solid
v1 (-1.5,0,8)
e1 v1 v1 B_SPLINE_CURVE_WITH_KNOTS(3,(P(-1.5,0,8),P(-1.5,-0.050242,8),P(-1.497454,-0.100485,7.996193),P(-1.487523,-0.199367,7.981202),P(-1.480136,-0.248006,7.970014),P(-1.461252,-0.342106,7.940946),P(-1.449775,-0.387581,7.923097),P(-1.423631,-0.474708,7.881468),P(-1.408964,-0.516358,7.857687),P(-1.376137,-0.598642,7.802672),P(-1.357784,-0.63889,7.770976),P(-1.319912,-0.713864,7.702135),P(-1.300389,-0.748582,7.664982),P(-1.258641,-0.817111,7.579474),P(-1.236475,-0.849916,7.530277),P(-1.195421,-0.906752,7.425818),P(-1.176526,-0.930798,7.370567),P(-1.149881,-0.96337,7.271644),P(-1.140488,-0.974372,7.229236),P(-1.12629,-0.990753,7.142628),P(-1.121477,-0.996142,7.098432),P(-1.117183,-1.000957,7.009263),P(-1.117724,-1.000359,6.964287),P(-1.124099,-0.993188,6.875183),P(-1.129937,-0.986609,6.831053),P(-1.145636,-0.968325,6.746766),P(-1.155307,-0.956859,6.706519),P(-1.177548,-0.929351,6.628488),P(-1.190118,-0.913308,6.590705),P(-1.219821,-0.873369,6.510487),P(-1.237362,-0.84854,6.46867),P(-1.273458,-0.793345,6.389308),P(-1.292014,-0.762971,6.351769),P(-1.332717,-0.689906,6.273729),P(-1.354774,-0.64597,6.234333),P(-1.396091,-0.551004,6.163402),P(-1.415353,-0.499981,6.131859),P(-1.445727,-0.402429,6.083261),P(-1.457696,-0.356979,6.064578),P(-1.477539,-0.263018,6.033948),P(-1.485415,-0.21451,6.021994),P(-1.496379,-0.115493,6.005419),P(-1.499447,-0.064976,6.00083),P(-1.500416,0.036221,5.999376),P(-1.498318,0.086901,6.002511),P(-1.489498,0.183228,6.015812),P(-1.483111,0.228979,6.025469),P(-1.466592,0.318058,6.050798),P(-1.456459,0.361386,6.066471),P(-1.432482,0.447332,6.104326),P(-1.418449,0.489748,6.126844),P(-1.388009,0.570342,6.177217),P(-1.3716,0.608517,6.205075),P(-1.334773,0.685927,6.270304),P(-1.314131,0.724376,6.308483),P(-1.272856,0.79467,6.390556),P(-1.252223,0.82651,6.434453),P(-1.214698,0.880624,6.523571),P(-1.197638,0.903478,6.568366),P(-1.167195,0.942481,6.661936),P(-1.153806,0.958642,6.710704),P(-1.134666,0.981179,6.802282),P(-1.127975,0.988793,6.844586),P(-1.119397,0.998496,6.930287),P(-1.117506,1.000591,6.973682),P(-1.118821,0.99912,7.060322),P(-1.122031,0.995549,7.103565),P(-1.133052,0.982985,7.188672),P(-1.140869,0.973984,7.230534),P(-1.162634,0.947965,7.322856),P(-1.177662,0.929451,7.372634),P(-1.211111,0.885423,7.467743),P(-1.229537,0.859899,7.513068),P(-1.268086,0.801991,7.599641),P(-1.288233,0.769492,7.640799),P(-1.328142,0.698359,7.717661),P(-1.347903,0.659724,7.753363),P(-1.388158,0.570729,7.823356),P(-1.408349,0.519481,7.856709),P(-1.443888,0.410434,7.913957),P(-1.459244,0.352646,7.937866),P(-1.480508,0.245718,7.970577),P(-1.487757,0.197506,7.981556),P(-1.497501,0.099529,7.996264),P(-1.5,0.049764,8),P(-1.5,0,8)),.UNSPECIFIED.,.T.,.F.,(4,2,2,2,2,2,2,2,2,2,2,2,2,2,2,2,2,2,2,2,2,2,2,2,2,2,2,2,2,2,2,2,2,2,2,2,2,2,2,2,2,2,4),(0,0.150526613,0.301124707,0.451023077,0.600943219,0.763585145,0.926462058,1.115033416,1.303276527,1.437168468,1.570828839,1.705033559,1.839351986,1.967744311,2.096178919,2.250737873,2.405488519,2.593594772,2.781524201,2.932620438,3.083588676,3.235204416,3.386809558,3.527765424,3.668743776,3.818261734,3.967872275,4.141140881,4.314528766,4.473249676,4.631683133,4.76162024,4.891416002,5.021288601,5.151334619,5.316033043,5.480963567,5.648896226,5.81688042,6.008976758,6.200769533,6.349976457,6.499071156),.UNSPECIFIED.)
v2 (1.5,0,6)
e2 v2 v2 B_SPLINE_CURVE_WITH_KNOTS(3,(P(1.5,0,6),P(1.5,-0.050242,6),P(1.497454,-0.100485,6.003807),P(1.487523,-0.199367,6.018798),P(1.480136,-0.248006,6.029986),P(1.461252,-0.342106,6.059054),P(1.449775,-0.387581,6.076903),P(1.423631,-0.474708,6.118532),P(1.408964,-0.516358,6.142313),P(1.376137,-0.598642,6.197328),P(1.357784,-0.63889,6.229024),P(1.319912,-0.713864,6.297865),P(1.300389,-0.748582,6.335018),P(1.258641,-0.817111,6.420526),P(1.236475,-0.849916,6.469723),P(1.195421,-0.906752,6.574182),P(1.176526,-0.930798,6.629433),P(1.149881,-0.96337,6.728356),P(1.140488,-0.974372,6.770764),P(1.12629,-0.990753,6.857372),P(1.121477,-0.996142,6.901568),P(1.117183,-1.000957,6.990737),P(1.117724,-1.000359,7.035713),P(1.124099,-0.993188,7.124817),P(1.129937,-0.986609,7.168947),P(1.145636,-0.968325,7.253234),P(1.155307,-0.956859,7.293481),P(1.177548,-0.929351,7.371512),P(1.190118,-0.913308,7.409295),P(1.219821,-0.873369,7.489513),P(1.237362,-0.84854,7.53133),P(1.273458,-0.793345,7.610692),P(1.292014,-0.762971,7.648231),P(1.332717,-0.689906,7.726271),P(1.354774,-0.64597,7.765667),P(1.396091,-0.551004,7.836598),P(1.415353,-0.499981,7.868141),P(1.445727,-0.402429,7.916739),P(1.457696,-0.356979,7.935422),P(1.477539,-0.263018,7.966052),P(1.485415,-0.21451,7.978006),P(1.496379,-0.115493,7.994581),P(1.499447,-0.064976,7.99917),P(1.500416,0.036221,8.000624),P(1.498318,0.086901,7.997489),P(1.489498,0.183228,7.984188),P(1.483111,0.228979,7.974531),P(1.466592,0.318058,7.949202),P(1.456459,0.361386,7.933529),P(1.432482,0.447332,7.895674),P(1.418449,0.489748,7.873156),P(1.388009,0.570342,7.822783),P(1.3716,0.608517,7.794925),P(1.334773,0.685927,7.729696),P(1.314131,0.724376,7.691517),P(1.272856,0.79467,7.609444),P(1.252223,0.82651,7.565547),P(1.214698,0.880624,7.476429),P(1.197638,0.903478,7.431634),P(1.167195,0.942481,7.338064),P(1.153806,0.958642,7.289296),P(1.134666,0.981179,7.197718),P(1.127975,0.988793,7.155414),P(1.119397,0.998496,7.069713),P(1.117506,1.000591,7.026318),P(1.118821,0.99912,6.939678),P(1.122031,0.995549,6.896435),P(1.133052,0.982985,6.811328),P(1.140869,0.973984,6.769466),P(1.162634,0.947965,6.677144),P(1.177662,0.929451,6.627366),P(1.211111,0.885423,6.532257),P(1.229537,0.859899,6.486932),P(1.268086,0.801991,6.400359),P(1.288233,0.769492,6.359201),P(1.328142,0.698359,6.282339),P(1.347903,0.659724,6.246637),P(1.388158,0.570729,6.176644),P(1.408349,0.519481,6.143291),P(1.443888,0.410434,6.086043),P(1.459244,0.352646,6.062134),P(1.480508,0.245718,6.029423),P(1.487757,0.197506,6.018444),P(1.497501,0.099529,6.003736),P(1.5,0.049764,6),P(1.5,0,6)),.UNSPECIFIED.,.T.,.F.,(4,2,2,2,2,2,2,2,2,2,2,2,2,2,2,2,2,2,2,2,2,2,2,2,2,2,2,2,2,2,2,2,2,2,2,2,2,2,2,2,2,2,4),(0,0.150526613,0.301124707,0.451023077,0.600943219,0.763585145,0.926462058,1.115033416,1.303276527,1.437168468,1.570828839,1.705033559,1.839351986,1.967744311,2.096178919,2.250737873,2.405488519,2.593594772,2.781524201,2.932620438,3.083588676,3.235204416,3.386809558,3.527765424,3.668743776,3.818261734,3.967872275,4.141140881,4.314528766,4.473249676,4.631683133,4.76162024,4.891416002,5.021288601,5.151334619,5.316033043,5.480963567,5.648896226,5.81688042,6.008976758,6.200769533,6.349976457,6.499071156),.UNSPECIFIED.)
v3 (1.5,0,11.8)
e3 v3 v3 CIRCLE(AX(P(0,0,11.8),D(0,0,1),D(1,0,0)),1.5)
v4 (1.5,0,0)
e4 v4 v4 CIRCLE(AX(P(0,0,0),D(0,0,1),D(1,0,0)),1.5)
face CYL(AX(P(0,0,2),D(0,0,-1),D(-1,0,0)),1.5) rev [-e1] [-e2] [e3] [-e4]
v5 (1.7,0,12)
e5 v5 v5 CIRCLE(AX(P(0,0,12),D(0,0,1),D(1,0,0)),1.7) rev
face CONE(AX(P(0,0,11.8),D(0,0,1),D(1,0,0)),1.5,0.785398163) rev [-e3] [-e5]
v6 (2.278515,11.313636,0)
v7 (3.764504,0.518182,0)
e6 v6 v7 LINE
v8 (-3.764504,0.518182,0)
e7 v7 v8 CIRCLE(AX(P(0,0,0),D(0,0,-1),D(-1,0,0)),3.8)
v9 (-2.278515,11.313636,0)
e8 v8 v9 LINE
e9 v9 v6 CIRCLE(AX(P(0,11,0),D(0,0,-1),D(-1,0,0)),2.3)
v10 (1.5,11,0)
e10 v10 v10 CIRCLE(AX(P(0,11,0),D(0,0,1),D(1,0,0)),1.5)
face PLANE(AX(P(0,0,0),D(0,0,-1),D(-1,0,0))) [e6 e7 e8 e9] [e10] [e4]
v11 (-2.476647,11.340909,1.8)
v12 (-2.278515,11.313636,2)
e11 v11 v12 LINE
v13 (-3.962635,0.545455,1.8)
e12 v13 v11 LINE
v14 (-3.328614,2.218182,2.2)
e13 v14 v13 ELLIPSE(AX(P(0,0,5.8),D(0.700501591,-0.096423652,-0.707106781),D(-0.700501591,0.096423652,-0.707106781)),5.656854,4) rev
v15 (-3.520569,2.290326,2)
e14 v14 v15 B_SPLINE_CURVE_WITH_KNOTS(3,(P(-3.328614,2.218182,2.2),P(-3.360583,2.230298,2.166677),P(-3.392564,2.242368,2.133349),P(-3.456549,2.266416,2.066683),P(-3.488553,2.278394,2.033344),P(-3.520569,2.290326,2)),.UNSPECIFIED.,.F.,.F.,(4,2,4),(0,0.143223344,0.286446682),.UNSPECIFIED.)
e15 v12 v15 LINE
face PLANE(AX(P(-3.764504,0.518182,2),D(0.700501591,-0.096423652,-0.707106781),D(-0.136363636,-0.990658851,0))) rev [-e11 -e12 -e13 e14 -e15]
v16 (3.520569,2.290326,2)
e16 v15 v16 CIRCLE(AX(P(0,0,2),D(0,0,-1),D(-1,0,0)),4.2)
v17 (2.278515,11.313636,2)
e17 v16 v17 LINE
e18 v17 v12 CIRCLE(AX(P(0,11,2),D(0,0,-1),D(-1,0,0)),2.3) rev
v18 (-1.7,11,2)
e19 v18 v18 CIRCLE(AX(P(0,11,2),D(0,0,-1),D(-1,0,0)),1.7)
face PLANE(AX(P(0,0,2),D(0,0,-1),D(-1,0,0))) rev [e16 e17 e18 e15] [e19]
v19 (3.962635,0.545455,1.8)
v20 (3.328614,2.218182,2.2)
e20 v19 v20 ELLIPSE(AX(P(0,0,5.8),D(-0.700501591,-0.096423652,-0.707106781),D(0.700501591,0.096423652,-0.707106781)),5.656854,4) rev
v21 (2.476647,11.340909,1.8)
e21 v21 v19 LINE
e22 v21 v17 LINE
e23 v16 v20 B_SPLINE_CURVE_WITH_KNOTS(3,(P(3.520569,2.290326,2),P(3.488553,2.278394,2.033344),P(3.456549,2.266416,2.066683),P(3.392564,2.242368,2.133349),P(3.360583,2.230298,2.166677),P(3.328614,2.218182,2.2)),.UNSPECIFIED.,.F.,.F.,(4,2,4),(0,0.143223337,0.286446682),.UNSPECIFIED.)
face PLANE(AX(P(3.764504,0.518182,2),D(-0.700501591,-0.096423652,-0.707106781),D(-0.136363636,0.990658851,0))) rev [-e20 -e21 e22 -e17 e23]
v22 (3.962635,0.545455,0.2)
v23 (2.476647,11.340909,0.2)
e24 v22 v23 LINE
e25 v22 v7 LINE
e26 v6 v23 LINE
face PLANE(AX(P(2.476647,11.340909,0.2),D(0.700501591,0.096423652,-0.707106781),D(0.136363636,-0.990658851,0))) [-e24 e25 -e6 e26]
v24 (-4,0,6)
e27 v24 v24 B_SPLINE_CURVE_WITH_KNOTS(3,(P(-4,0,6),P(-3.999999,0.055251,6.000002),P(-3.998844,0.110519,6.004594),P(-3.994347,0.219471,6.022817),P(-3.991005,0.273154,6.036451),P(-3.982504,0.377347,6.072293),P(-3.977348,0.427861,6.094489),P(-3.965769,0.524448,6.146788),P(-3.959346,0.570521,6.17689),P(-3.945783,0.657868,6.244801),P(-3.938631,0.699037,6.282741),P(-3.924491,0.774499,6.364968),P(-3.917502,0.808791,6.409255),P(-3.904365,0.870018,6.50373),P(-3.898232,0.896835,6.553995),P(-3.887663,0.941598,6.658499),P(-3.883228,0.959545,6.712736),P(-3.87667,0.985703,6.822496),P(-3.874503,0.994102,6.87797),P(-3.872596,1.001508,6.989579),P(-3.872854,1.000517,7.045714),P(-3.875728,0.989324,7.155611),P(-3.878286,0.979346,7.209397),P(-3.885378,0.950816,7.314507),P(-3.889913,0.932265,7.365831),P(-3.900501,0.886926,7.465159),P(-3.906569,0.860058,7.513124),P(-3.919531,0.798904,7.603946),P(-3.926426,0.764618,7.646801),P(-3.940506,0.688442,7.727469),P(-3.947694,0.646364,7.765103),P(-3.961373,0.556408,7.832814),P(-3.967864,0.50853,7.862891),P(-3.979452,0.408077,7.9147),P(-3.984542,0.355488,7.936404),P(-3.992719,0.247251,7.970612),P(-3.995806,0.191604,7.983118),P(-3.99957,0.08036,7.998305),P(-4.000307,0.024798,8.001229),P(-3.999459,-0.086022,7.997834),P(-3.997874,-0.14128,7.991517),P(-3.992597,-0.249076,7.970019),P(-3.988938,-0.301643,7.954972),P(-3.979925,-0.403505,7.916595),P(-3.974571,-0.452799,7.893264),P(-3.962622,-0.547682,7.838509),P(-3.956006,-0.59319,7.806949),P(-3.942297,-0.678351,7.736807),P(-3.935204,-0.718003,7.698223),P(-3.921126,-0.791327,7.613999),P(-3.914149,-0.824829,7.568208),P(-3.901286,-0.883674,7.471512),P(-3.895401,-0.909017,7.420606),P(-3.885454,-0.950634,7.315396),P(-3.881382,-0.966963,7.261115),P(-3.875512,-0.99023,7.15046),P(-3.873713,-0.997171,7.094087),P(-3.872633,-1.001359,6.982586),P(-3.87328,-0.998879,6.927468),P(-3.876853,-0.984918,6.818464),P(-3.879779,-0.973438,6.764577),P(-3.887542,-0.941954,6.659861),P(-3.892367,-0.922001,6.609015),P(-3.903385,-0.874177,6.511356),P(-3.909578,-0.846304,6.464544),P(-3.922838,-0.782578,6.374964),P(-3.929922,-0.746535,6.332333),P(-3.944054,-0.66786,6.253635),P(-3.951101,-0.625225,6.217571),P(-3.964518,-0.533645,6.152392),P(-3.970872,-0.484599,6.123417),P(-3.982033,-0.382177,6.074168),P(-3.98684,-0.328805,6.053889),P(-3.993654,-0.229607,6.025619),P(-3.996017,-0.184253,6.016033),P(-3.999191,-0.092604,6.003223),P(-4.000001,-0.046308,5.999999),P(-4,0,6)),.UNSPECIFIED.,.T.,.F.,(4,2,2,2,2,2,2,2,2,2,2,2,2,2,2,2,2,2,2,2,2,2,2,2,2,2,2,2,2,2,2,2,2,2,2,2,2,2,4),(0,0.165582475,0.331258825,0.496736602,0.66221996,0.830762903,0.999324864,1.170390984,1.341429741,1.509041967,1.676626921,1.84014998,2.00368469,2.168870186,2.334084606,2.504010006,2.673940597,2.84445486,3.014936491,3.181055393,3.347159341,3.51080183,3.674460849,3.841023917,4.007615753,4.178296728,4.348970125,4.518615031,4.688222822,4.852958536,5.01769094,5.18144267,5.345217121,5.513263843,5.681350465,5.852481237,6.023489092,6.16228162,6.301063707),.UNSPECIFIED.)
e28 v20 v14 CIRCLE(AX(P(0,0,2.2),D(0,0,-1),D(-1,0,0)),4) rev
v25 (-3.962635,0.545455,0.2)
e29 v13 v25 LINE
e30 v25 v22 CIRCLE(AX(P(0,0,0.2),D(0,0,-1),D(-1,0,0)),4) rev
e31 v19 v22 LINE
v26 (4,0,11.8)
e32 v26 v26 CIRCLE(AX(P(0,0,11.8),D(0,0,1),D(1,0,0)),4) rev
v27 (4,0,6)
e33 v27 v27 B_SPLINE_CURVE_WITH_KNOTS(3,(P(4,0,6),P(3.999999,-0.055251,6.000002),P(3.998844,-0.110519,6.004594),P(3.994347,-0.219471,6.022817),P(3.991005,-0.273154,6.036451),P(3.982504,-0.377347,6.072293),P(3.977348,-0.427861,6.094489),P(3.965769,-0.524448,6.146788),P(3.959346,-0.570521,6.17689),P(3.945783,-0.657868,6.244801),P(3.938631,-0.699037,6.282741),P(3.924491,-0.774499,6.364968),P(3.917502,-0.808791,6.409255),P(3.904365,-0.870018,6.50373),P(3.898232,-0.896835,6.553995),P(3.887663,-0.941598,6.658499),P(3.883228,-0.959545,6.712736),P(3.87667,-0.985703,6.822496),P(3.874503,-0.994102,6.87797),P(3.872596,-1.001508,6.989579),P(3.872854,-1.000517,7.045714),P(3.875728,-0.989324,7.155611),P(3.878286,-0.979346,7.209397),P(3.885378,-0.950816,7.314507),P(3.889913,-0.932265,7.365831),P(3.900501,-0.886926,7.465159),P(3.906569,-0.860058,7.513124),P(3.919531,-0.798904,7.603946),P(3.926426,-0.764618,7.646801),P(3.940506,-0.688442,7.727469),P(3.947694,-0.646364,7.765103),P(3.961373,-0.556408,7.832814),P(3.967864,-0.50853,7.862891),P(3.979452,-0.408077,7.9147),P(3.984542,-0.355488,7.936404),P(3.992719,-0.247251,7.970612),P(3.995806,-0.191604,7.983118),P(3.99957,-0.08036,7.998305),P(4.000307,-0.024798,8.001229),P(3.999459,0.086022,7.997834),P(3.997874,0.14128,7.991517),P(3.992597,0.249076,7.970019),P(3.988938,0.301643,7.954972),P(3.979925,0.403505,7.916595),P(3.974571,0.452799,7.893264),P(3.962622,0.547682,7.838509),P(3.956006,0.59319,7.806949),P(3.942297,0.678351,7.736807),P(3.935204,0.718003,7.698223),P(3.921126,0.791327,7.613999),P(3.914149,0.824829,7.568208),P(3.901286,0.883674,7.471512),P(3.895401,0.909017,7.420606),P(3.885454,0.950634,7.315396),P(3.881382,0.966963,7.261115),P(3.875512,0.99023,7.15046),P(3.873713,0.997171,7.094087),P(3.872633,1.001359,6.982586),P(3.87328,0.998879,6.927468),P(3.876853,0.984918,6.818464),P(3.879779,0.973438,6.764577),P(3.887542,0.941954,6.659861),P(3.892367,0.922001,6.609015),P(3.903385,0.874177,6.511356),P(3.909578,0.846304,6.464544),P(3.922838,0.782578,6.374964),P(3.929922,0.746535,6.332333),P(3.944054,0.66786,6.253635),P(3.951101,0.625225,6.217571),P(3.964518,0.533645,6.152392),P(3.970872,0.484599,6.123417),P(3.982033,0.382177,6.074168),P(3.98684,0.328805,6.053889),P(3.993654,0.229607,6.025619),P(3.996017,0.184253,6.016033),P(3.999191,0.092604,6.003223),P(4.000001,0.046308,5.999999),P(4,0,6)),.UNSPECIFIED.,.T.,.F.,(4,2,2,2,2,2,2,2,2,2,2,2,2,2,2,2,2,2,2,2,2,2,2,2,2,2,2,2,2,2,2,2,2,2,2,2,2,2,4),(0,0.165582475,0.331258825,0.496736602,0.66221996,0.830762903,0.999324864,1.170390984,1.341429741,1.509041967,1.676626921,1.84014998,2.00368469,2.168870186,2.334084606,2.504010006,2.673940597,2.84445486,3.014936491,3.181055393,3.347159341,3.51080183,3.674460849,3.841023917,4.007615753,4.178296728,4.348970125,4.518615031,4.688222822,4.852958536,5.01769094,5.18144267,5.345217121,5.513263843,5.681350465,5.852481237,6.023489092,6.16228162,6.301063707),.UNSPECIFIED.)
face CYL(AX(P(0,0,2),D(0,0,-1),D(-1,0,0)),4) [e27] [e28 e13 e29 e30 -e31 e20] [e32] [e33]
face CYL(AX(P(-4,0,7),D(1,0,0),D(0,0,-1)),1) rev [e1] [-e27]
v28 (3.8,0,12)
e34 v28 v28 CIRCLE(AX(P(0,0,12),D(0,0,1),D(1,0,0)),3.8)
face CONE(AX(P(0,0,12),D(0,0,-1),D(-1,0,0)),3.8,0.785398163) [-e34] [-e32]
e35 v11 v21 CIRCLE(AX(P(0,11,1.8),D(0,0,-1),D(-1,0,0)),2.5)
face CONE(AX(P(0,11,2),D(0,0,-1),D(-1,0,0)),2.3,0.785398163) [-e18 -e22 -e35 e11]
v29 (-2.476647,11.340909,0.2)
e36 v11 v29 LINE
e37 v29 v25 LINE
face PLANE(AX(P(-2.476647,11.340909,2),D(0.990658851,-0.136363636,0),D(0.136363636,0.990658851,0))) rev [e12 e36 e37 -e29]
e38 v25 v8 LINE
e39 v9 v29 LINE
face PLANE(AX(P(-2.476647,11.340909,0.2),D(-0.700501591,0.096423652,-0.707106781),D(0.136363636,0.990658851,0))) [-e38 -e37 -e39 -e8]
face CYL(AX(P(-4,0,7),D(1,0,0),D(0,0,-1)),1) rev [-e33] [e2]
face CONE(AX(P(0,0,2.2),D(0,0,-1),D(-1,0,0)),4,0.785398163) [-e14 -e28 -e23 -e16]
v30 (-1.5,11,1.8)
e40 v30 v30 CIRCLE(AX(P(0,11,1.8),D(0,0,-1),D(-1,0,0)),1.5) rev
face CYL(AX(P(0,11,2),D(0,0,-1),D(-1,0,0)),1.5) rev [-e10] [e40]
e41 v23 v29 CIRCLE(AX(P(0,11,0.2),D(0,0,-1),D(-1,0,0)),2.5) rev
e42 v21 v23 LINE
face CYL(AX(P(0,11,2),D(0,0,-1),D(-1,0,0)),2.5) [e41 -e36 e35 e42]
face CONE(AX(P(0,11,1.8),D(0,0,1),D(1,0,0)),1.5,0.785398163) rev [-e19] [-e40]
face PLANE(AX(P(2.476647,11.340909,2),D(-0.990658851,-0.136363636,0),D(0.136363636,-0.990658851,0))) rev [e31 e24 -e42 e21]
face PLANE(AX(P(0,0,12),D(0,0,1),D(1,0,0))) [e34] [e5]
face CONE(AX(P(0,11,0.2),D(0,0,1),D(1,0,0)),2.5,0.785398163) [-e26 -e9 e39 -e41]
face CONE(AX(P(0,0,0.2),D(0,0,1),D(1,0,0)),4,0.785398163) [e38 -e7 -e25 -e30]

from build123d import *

# Parameters (mm, degrees)
SKETCH1_R               = 1.5
BOSS_EXTRUDE1_DEPTH     = 2
SKETCH2_R               = 4
SKETCH2_R_2             = 1.5
BOSS_EXTRUDE2_DEPTH     = 10
CUT_EXTRUDE1_DEPTH      = 19.5
CUT_EXTRUDE1_DEPTH_BACK = 19.5
SKETCH3_R               = 1
CHAMFER1_SIZE           = 0.2
CHAMFER2_SIZE           = 0.2


with BuildPart() as part:
    # Sketch1 → Boss-Extrude1 (new body)
    with BuildSketch(Plane.XY):
        with BuildLine():
            Line((-2.476647127, 11.340909091), (-3.962635403, 0.545454545))
            ThreePointArc((-3.962635403, 0.545454545), (0, -4), (3.962635403, 0.545454545))
            Line((3.962635403, 0.545454545), (2.476647127, 11.340909091))
            ThreePointArc((2.476647127, 11.340909091), (0, 13.5), (-2.476647127, 11.340909091))
        make_face()
        with Locations((0, 11)):
            Circle(SKETCH1_R, mode=Mode.SUBTRACT)
        Circle(SKETCH1_R, mode=Mode.SUBTRACT)
    extrude(amount=BOSS_EXTRUDE1_DEPTH)

    # Sketch2 → Boss-Extrude2 (add)
    with BuildSketch(Plane.XY.offset(2)):
        with Locations(Location((0, 0, 0), (0, 0, 172.162520237))):
            Circle(SKETCH2_R)
        Circle(SKETCH2_R_2, mode=Mode.SUBTRACT)
    extrude(amount=BOSS_EXTRUDE2_DEPTH)

    # Sketch3 → Cut-Extrude1 (cut, two sides: drawn at the far end of the back side and taken through both)
    with BuildSketch(Plane(origin=(0, 0, 0), x_dir=(0, 0, -1), z_dir=(1, 0, 0)).offset(-CUT_EXTRUDE1_DEPTH_BACK)):
        with Locations((-7, 0)):
            Circle(SKETCH3_R)
    extrude(amount=CUT_EXTRUDE1_DEPTH + CUT_EXTRUDE1_DEPTH_BACK, mode=Mode.SUBTRACT)

    # Chamfer1
    # the kernel refuses this chamfer: 0.2 mm, written as the material it takes off along each edge
    with BuildSketch(Plane(origin=(0, 11, 2), x_dir=(1, 0, 0), z_dir=(0, -1, 0))) as chamfer1_piece_1:
        Polygon((1.5 + CHAMFER1_SIZE, 0), (1.5, -CHAMFER1_SIZE), (1.5, 0), align=None)
    revolve(axis=Axis((0, 11, 2), (0, 0, 1)), mode=Mode.SUBTRACT)
    with BuildSketch(Plane(origin=(0, 11, 2), x_dir=(0.9906588508046985, 0.13636363636363596, 0), z_dir=(0.13636363636363596, -0.9906588508046985, 0))) as chamfer1_piece_2:
        Polygon((2.5, -CHAMFER1_SIZE), (2.5 - CHAMFER1_SIZE, 0), (2.5, 0), align=None)
    revolve(axis=Axis((0, 11, 2), (0, 0, 1)), revolution_arc=164.325040474, mode=Mode.SUBTRACT)
    with BuildSketch(Plane(origin=(-2.476647127, 11.340909091, 2), x_dir=(0.9902842994465351, -0.13631207957881322, 0.02749587661058738), z_dir=(-0.1363636363636364, -0.9906588508046986, 0))) as chamfer1_piece_3_section:
        Polygon((CHAMFER1_SIZE * 0.999621916911, -CHAMFER1_SIZE * 0.0274958766106), (-CHAMFER1_SIZE * 0.0274958766106, -CHAMFER1_SIZE * 0.999621916911), (0, 0), align=None)
    chamfer1_piece_3 = extrude(amount=11.411583956, mode=Mode.PRIVATE)
    chamfer1_piece_3 = chamfer1_piece_3 - Plane(origin=(0, 0, 1.932985059), x_dir=(-0.9906588508048991, 0.13636363636217924, 0), z_dir=(0, 0, -1)) * Cylinder(4, 24, mode=Mode.PRIVATE)
    add(chamfer1_piece_3, mode=Mode.SUBTRACT)
    with BuildSketch(Plane(origin=(0, 0, 12), x_dir=(-0.9906588508048991, 0.13636363636217924, 0), z_dir=(0.13636363636217924, 0.9906588508048991, 0))) as chamfer1_piece_4:
        Polygon((4, -CHAMFER1_SIZE), (4 - CHAMFER1_SIZE, 0), (4, 0), align=None)
    revolve(axis=Axis((0, 0, 12), (0, 0, 1)), mode=Mode.SUBTRACT)
    with BuildSketch(Plane(origin=(0, 0, 12), x_dir=(1, 0, 0), z_dir=(0, -1, 0))) as chamfer1_piece_5:
        Polygon((1.5, -CHAMFER1_SIZE), (1.5 + CHAMFER1_SIZE, 0), (1.5, 0), align=None)
    revolve(axis=Axis((0, 0, 12), (0, 0, 1)), mode=Mode.SUBTRACT)
    with BuildSketch(Plane(origin=(-2.476647127, 11.340909091, 0), x_dir=(0.9902842994465351, -0.13631207957881322, -0.027495876610586414), z_dir=(-0.1363636363636364, -0.9906588508046986, 0))) as chamfer1_piece_6:
        Polygon((CHAMFER1_SIZE * 0.999621916911, CHAMFER1_SIZE * 0.0274958766106), (-CHAMFER1_SIZE * 0.0274958766106, CHAMFER1_SIZE * 0.999621916911), (0, 0), align=None)
    extrude(amount=10.897247359, mode=Mode.SUBTRACT)
    with BuildSketch(Plane(origin=(0, 11, 0), x_dir=(0.9906588508046985, 0.13636363636363596, 0), z_dir=(0.13636363636363596, -0.9906588508046985, 0))) as chamfer1_piece_7:
        Polygon((2.5, CHAMFER1_SIZE), (2.5 - CHAMFER1_SIZE, 0), (2.5, 0), align=None)
    revolve(axis=Axis((0, 11, 0), (0, 0, 1)), revolution_arc=164.325040474, mode=Mode.SUBTRACT)
    with BuildSketch(Plane(origin=(3.962635403, 0.545454545, 0), x_dir=(0.027239033524910743, 0.0037494377196253415, 0.9996219169112968), z_dir=(-0.1363636363636364, 0.9906588508046986, 0))) as chamfer1_piece_8:
        Polygon((CHAMFER1_SIZE * 0.999621916911, -CHAMFER1_SIZE * 0.0274958766106), (-CHAMFER1_SIZE * 0.0274958766106, -CHAMFER1_SIZE * 0.999621916911), (0, 0), align=None)
    extrude(amount=10.897247359, mode=Mode.SUBTRACT)
    with BuildSketch(Plane(origin=(0, 0, 0), x_dir=(-0.9906588508046986, 0.13636363636363646, 0), z_dir=(0.13636363636363646, 0.9906588508046986, 0))) as chamfer1_piece_9:
        Polygon((4, CHAMFER1_SIZE), (4 - CHAMFER1_SIZE, 0), (4, 0), align=None)
    revolve(axis=Axis((0, 0, 0), (0, 0, 1)), revolution_arc=195.674959526, mode=Mode.SUBTRACT)
    with BuildSketch(Plane(origin=(4.032772212, 0.035922443, 2), x_dir=(0.02723903352491077, 0.003749437719625345, -0.9996219169112968), z_dir=(-0.1363636363636364, 0.9906588508046986, 0))) as chamfer1_piece_10_section:
        Polygon((CHAMFER1_SIZE * 0.999621916911, CHAMFER1_SIZE * 0.0274958766106), (-CHAMFER1_SIZE * 0.0274958766106, CHAMFER1_SIZE * 0.999621916911), (0, 0), align=None)
    chamfer1_piece_10 = extrude(amount=11.411583956, mode=Mode.PRIVATE)
    chamfer1_piece_10 = chamfer1_piece_10 - Plane(origin=(0, 0, 1.932985114), x_dir=(-0.9906588508048991, 0.13636363636217924, 0), z_dir=(0, 0, -1)) * Cylinder(4, 24, mode=Mode.PRIVATE)
    add(chamfer1_piece_10, mode=Mode.SUBTRACT)

    # Chamfer2
    # the kernel refuses this chamfer: 0.2 mm, written as the material it adds along each edge
    with BuildSketch(Plane(origin=(0, 0, 2), x_dir=(0.9474392315450817, 0.31993577875765195, 0), z_dir=(0.31993577875765195, -0.9474392315450817, 0))) as chamfer2_piece_1_section:
        Polygon((4 + CHAMFER2_SIZE, 0), (4, CHAMFER2_SIZE), (4, 0), align=None)
    chamfer2_piece_1 = revolve(axis=Axis((0, 0, 2), (0, 0, 1)), revolution_arc=142.681917796, mode=Mode.PRIVATE)
    chamfer2_piece_1 = split(chamfer2_piece_1, bisect_by=Plane(origin=(1.558048565, 4.310442532, 3.668717781), z_dir=(-0.700501591246356, -0.0964236519801952, -0.7071067811866362)), keep=Keep.TOP, mode=Mode.PRIVATE)
    chamfer2_piece_1 = split(chamfer2_piece_1, bisect_by=Plane(origin=(-1.558048565, 4.310442532, 3.668717781), z_dir=(0.7005015912467089, -0.09642365198024379, -0.70710678118628)), keep=Keep.TOP, mode=Mode.PRIVATE)
    add(chamfer2_piece_1)


solid = part.part
